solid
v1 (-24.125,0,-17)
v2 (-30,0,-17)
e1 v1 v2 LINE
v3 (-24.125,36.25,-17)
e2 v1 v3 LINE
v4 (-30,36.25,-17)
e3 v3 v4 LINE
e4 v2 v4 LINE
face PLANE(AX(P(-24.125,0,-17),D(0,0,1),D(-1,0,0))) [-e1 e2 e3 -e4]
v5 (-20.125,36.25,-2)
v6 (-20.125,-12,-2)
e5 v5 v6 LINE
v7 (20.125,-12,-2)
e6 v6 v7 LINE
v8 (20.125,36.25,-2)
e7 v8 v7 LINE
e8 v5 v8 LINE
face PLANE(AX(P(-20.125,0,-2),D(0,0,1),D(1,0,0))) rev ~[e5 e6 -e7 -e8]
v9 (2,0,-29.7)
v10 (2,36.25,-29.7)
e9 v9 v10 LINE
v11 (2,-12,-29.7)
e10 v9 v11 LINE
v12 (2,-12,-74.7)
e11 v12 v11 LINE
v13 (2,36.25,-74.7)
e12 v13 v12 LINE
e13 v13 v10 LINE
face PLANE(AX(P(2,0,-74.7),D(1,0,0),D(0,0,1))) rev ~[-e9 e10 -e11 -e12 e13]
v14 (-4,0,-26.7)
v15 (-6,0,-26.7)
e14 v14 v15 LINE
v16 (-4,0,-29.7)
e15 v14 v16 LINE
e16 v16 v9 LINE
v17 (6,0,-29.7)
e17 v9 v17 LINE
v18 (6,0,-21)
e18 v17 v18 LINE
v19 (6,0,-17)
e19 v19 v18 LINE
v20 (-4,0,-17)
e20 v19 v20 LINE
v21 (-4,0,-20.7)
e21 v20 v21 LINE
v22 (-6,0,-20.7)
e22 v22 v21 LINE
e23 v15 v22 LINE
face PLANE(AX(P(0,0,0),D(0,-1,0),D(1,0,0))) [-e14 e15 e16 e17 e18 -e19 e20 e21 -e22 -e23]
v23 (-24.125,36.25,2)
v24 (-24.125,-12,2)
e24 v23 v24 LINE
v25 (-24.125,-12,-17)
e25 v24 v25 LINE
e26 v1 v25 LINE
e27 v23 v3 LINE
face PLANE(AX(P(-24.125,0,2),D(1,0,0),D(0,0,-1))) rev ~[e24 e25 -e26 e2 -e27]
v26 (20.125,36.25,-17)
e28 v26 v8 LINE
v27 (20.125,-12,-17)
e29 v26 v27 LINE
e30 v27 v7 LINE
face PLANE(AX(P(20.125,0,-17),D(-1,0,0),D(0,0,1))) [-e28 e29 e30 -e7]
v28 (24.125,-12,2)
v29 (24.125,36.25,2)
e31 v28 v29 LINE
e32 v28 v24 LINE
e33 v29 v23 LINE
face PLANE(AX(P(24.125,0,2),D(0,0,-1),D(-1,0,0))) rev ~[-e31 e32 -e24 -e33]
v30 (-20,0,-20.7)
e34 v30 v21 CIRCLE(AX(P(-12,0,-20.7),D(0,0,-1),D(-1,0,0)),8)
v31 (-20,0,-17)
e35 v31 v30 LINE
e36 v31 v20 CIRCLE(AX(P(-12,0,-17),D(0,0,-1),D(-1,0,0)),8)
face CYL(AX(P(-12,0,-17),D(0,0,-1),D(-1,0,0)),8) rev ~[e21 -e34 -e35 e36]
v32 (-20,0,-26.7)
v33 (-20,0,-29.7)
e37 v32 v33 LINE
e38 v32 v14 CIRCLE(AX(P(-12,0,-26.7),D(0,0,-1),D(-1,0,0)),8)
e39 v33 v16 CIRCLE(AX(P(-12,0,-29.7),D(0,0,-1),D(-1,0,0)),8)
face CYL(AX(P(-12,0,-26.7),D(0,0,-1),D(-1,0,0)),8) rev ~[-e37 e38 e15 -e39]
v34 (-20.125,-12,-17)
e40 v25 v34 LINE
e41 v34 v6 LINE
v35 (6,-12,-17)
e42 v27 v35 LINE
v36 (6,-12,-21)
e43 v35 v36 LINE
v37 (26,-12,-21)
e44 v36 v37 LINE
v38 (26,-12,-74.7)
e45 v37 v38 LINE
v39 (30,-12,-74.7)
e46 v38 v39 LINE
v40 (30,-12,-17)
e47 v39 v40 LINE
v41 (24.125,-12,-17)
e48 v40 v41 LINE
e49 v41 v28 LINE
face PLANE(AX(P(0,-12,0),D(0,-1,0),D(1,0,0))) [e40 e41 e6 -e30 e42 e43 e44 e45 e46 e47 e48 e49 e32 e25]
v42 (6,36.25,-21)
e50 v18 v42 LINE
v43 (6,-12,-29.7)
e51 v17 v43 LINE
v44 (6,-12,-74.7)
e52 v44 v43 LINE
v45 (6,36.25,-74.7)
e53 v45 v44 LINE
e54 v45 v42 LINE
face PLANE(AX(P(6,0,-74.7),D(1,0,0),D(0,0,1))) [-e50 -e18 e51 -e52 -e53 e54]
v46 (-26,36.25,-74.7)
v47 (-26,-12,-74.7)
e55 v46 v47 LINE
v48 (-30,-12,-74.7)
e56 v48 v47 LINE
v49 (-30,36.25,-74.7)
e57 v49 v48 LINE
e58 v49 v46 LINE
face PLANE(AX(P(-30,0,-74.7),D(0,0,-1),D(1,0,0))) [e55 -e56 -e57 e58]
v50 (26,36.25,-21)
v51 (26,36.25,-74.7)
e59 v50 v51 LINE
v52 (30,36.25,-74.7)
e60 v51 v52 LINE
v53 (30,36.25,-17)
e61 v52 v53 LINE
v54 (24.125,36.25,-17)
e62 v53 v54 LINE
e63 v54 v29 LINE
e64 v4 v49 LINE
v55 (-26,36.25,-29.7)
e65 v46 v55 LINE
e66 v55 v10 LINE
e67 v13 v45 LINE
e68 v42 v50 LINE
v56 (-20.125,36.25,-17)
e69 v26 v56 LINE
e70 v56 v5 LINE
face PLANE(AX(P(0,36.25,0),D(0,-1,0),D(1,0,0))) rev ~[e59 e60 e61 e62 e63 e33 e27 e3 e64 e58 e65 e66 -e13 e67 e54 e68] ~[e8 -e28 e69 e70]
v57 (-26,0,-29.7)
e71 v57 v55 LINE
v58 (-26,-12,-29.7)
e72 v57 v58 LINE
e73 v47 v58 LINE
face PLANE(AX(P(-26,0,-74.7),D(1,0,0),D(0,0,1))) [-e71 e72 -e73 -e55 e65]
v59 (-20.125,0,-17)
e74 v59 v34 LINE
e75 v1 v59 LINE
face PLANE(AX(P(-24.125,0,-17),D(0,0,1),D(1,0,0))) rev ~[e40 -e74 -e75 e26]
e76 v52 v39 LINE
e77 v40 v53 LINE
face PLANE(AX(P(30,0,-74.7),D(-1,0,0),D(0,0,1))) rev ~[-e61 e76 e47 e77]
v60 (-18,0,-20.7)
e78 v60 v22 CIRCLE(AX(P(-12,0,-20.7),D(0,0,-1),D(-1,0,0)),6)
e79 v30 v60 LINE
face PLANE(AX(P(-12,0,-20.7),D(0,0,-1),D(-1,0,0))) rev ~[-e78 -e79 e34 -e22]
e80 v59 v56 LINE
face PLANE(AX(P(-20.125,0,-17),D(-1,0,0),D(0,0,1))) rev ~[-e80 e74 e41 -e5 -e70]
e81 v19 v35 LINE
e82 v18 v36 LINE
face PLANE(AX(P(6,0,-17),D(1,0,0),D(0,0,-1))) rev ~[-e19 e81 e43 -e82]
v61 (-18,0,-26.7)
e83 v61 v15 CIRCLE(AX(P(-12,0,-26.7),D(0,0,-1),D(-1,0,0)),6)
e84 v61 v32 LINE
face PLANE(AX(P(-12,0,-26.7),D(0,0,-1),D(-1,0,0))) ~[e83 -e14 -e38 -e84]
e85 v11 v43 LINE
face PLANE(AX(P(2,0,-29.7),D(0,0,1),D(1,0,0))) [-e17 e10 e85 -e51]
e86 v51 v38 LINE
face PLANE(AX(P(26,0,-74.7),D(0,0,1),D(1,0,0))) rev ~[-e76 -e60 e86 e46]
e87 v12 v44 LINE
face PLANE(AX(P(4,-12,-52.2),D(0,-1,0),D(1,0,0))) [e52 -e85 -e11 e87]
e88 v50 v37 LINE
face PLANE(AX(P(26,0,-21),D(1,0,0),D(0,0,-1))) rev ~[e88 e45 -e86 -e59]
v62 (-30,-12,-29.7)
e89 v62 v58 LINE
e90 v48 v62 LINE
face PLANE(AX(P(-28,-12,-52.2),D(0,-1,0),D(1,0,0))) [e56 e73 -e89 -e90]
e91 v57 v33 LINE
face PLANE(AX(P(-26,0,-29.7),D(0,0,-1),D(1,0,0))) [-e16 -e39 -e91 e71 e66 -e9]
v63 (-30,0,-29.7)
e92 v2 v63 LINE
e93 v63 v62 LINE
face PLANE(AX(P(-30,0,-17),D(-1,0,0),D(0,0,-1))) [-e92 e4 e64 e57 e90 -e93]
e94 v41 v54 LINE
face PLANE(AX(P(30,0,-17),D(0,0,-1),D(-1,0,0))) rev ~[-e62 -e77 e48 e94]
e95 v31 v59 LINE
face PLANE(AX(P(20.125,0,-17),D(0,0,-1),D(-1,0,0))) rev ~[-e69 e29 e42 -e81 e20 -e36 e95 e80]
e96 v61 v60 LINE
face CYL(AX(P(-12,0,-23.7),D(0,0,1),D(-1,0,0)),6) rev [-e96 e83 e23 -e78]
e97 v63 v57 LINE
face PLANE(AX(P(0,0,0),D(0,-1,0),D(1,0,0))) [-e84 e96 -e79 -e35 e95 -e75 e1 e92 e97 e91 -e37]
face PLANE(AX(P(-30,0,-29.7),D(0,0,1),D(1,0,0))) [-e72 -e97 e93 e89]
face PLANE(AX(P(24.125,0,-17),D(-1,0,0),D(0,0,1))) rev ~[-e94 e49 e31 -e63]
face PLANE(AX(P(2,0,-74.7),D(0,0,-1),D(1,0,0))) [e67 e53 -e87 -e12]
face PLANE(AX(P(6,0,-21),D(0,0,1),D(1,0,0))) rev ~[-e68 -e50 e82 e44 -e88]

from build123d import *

# Parameters (mm, degrees)
F1_W     = 4
F1_H     = 15
F1_W_2   = 6
F1_H_2   = 6
F1_H_3   = 45
F2_DEPTH = 36.25
F4_DEPTH = 12


# Not quite as in the source:
# - a feature names something its author has since deleted; it is built from what else it names


with BuildPart() as f2:
    # F1 (on Front) → F2 (new body)
    with BuildSketch(Plane.XZ):
        Polygon((24.125, -2), (24.125, 2), (-24.125, 2), (-24.125, -2), (-20.125, -2), (20.125, -2), align=None)
        with Locations((-22.125, -9.5)):
            Rectangle(F1_W, F1_H)
        with Locations((22.125, -9.5)):
            Rectangle(F1_W, F1_H)
        Polygon((24.125, -21), (24.125, -17), (20.125, -17), (6, -17), (6, -21), align=None)
        Polygon((6, -21), (6, -17), (-4, -17), (-4, -20.7), (-6, -20.7), (-6, -26.7), (-4, -26.7), (-4, -29.7), (-0.85, -29.7), (2, -29.7), (6, -29.7), align=None)
        Polygon((-20.125, -17), (-24.125, -17), (-30, -17), (-30, -29.7), (-26, -29.7), (-23.15, -29.7), (-20, -29.7), (-20, -26.7), (-18, -26.7), (-18, -20.7), (-20, -20.7), (-20, -17), align=None)
        Polygon((-4, -20.7), (-4, -17), (-12, -17), (-12, -20.7), (-6, -20.7), align=None)
        Polygon((-12, -17), (-20, -17), (-20, -20.7), (-18, -20.7), (-12, -20.7), align=None)
        with Locations((-15, -23.7)):
            Rectangle(F1_W_2, F1_H_2)
        with Locations((-9, -23.7)):
            Rectangle(F1_W_2, F1_H_2)
        Polygon((-12, -29.7), (-12, -26.7), (-18, -26.7), (-20, -26.7), (-20, -29.7), align=None)
        Polygon((-6, -26.7), (-12, -26.7), (-12, -29.7), (-4, -29.7), (-4, -26.7), align=None)
        Polygon((30, -17), (24.125, -17), (24.125, -21), (26, -21), (26, -74.7), (30, -74.7), align=None)
        with Locations((-28, -52.2)):
            Rectangle(F1_W, F1_H_3)
        with Locations((4, -52.2)):
            Rectangle(F1_W, F1_H_3)
    extrude(amount=-F2_DEPTH)

    # F1 (on Front) → F3 (revolve, cut)
    with BuildSketch(Plane.XZ):
        Polygon((-12, -17), (-20, -17), (-20, -20.7), (-18, -20.7), (-12, -20.7), align=None)
        with Locations((-15, -23.7)):
            Rectangle(F1_W_2, F1_H_2)
        Polygon((-12, -29.7), (-12, -26.7), (-18, -26.7), (-20, -26.7), (-20, -29.7), align=None)
    revolve(axis=Axis((-12, 0, -48.15), (0, 0, -1)), mode=Mode.SUBTRACT)

    # F1 (on Front) → F4 (join)
    with BuildSketch(Plane.XZ):
        Polygon((24.125, -2), (24.125, 2), (-24.125, 2), (-24.125, -2), (-20.125, -2), (20.125, -2), align=None)
        with Locations((22.125, -9.5)):
            Rectangle(F1_W, F1_H)
        with Locations((-22.125, -9.5)):
            Rectangle(F1_W, F1_H)
        Polygon((24.125, -21), (24.125, -17), (20.125, -17), (6, -17), (6, -21), align=None)
        Polygon((30, -17), (24.125, -17), (24.125, -21), (26, -21), (26, -74.7), (30, -74.7), align=None)
        with Locations((-28, -52.2)):
            Rectangle(F1_W, F1_H_3)
        with Locations((4, -52.2)):
            Rectangle(F1_W, F1_H_3)
    extrude(amount=F4_DEPTH)


solid = f2.part
